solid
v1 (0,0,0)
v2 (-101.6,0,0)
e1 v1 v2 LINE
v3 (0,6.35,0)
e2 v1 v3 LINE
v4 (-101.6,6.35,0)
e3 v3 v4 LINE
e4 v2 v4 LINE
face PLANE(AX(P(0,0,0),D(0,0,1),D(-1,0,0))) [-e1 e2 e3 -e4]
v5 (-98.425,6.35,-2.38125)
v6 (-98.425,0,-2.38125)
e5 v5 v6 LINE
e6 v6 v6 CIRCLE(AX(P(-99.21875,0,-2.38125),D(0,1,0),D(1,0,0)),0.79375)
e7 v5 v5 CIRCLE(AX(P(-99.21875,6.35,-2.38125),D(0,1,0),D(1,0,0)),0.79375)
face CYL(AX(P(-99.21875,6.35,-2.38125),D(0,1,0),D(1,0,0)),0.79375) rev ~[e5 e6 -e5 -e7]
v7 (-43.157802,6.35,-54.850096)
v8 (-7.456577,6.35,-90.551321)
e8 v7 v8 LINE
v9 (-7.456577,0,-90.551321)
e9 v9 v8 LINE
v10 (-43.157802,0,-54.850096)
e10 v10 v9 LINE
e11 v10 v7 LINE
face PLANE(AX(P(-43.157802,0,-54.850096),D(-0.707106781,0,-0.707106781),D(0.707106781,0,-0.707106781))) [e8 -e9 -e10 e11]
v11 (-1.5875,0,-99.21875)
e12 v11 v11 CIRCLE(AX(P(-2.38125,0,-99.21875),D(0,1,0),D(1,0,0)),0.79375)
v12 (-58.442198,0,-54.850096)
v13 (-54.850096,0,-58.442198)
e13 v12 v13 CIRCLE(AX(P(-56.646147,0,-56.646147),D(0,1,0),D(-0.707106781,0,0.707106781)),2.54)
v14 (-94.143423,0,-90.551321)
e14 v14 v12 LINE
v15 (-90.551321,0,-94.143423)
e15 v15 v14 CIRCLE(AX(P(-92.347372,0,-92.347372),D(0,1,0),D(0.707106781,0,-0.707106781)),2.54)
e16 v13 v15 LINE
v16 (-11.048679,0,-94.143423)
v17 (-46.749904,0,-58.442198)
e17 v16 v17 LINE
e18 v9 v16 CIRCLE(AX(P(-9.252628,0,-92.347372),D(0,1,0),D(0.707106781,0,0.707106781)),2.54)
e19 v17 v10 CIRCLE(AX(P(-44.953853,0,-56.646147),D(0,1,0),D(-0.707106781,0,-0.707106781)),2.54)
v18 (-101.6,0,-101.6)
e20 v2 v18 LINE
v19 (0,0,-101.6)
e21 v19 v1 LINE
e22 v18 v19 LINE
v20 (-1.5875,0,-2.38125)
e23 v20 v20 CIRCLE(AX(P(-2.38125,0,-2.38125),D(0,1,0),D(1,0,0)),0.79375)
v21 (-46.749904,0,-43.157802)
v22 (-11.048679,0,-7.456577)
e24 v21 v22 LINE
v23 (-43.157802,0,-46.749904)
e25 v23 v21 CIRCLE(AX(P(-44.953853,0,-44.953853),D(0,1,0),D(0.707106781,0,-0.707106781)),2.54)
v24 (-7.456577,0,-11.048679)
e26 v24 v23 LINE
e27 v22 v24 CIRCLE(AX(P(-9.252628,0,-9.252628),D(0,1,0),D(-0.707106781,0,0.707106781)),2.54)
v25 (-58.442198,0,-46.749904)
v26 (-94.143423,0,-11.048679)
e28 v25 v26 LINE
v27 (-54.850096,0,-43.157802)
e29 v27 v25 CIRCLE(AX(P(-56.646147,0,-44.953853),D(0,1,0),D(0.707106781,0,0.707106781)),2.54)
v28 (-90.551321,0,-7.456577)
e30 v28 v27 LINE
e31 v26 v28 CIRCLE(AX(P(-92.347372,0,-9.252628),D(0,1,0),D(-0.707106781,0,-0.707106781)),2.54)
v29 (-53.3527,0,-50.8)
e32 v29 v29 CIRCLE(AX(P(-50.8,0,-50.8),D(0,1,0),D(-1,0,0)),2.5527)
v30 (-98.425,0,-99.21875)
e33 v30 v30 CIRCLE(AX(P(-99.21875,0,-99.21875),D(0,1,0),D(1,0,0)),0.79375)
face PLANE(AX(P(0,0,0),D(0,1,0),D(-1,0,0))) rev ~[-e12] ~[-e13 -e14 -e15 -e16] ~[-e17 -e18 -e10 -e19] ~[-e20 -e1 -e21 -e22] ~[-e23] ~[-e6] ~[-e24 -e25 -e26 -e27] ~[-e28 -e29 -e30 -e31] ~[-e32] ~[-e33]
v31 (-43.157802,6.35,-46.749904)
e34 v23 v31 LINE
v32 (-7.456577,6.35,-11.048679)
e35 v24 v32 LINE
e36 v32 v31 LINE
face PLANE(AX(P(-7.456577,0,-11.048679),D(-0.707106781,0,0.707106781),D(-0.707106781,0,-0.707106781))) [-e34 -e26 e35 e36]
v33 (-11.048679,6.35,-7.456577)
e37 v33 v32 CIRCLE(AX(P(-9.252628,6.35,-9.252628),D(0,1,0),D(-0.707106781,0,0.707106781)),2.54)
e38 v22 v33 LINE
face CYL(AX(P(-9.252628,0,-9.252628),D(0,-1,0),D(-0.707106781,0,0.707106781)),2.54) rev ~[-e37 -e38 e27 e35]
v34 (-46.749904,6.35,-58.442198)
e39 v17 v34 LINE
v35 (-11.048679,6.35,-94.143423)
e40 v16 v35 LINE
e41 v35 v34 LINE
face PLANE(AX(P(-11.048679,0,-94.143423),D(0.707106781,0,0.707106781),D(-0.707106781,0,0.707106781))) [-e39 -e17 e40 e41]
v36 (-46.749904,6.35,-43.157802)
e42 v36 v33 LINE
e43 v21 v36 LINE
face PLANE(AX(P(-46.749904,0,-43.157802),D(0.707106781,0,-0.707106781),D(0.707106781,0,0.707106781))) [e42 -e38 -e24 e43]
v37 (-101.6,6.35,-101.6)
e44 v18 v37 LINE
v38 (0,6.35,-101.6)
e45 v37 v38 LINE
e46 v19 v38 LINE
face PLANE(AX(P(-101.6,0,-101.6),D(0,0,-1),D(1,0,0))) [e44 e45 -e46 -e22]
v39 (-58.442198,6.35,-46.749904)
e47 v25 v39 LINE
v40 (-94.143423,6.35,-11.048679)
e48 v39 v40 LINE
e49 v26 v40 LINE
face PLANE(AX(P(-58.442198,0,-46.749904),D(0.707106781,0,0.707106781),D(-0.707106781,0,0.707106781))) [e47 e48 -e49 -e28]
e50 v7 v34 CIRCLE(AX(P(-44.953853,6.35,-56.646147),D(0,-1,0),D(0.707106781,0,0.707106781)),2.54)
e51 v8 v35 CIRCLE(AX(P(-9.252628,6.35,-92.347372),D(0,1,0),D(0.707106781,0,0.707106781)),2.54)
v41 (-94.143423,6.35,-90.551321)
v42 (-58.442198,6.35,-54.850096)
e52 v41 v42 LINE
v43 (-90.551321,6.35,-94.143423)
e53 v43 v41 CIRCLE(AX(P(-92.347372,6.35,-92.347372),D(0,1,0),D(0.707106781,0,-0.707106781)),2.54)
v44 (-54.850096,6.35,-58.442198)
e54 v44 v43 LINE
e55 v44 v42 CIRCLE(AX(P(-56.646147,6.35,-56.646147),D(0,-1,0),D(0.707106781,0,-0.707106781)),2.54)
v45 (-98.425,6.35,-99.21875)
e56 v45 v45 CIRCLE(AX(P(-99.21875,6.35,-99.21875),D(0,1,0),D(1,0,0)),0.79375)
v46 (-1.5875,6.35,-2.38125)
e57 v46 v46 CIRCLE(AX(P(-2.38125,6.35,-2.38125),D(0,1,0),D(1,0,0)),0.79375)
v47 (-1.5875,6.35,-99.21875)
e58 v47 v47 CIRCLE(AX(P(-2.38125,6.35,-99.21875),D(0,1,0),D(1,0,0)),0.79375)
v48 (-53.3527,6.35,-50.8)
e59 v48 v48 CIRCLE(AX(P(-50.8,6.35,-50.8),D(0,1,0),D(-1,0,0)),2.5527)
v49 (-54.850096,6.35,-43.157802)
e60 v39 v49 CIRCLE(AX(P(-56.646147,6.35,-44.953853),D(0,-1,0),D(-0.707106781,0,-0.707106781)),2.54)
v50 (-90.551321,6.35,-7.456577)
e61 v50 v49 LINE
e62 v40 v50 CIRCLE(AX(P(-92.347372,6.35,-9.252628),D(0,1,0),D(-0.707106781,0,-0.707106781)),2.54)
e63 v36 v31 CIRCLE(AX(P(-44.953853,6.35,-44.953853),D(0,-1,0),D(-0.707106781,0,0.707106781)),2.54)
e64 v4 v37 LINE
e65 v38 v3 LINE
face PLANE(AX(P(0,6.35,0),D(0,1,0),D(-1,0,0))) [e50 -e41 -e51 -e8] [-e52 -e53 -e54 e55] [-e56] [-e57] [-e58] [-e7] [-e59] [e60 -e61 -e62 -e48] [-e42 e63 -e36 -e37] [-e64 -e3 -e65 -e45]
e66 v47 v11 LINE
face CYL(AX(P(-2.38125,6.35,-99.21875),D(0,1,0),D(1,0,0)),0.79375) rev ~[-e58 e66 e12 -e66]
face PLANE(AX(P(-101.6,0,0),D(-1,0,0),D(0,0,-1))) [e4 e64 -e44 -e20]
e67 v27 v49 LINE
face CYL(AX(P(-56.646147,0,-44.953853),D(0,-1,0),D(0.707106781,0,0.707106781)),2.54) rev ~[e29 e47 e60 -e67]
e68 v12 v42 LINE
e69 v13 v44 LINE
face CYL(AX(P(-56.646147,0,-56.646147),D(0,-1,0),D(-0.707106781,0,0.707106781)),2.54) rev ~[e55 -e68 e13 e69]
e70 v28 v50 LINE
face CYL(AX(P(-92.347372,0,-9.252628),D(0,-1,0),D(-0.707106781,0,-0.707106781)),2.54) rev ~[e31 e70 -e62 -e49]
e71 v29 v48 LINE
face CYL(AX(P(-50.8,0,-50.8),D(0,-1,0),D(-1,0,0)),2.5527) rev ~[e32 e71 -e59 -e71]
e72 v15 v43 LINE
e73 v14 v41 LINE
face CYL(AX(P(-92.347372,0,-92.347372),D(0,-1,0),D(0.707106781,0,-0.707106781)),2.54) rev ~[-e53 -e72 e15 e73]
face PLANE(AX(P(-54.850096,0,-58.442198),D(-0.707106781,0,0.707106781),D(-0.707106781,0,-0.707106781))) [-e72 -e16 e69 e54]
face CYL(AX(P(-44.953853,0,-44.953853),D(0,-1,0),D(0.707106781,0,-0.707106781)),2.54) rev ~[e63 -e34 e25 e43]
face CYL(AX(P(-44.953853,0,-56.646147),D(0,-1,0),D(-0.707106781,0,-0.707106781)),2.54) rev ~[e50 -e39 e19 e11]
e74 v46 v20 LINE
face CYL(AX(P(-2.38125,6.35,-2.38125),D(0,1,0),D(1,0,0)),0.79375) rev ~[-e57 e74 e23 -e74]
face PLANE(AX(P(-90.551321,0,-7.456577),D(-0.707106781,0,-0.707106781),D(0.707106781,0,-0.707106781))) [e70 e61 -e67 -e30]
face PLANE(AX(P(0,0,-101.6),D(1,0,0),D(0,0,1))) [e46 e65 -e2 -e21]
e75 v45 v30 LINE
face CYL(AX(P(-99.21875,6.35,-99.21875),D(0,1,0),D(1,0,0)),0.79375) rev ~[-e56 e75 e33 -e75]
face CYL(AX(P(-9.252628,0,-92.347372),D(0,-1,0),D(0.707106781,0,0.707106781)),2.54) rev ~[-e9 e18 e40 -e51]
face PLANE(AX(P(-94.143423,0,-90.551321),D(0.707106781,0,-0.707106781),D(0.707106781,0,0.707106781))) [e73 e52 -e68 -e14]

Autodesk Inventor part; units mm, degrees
ref_plane "YZ Plane" through (0, 0, 0) normal (1, 0, 0) x (0, 1, 0)
ref_plane "XZ Plane" through (0, 0, 0) normal (0, 1, 0) x (-1, 0, 0)
ref_plane "XY Plane" through (0, 0, 0) normal (0, 0, 1) x (1, 0, 0)
sketch "Sketch1" plane through (0, 0, 0) normal (0, 1, 0) x (-1, 0, 0)
  line L0 (0, 0) -> (101.6, 0)
  line L1 (101.6, 0) -> (101.6, -101.6)
  line L2 (101.6, -101.6) -> (0, -101.6)
  line L3 (0, -101.6) -> (0, 0)
  line L4 (4.7625, -96.8375) -> (96.8375, -96.8375)
  line L5 (96.8375, -96.8375) -> (96.8375, -4.7625)
  line L6 (96.8375, -4.7625) -> (4.7625, -4.7625)
  line L7 (4.7625, -4.7625) -> (4.7625, -96.8375)
  line L8 (96.8375, -4.7625) -> (4.7625, -96.8375) construction
  circle A0 centre (50.8, -50.8) radius 2.5527
  circle A1 centre (50.8, -50.8) radius 5.7277
  line L9 (54.850096, -46.749904) -> (94.143423, -7.456577) construction
  line L10 (58.442198, -46.749904) -> (94.143423, -11.048679)
  line L11 (90.551321, -7.456577) -> (54.850096, -43.157802)
  arc A2 (54.850096, -43.157802) -> (58.442198, -46.749904) centre (56.646147, -44.953853) ccw
  arc A3 (94.143423, -11.048679) -> (90.551321, -7.456577) centre (92.347372, -9.252628) ccw
  line L12 (46.749904, -43.157802) -> (11.048679, -7.456577)
  arc A4 (43.157802, -46.749904) -> (46.749904, -43.157802) centre (44.953853, -44.953853) ccw
  line L13 (7.456577, -11.048679) -> (43.157802, -46.749904)
  arc A5 (11.048679, -7.456577) -> (7.456577, -11.048679) centre (9.252628, -9.252628) ccw
  line L14 (43.157802, -54.850096) -> (7.456577, -90.551321)
  arc A6 (46.749904, -58.442198) -> (43.157802, -54.850096) centre (44.953853, -56.646147) ccw
  line L15 (11.048679, -94.143423) -> (46.749904, -58.442198)
  arc A7 (7.456577, -90.551321) -> (11.048679, -94.143423) centre (9.252628, -92.347372) ccw
  line L16 (54.850096, -58.442198) -> (90.551321, -94.143423)
  arc A8 (58.442198, -54.850096) -> (54.850096, -58.442198) centre (56.646147, -56.646147) ccw
  line L17 (94.143423, -90.551321) -> (58.442198, -54.850096)
  arc A9 (90.551321, -94.143423) -> (94.143423, -90.551321) centre (92.347372, -92.347372) ccw
  point P0 (0, -50.8)
  point P1 (74.496759, -27.103241)
  dimension "d0" = 101.6
  dimension "d1" = 101.6
  dimension "d2" = 4.7625
  dimension "d33" = 5.1054
  dimension "d34" = 3.175
  dimension "d35" = 5.08
  dimension "d36" = 6.35
  dimension "d39" = 360
extrude "Extrusion1" add sketch "Sketch1" along normal blind 6.35 contours L0 L1 L2 L3 | L7 L6 L5 L4 | A1
sketch "Sketch2" plane through (0, 6.35, 0) normal (0, 1, 0) x (1, 0, 0)
  line L0 (0, 101.6) -> (-101.6, 101.6)
  line L1 (-101.6, 101.6) -> (-101.6, 0)
  line L2 (-101.6, 0) -> (0, 0)
  line L3 (0, 0) -> (0, 101.6)
  circle A0 centre (-99.21875, 99.21875) radius 0.79375
  circle A1 centre (-99.21875, 2.38125) radius 0.79375
  circle A2 centre (-2.38125, 99.21875) radius 0.79375
  circle A3 centre (-2.38125, 2.38125) radius 0.79375
  dimension "d20" = 1.5875
  dimension "d21" = 2.38125
  dimension "d22" = 2.38125
  dimension "d25" = 96.8375
  dimension "d28" = 96.8375
extrude "Extrusion2" cut sketch "Sketch2" against normal blind 6.35 contours A0 | A1 | A2 | A3
sketch "Sketch3" plane through (0, 6.35, 0) normal (0, 1, 0) x (1, 0, 0)
  circle A0 centre (-99.21875, 99.21875) radius 0.79375
  circle A1 centre (-99.21875, 2.38125) radius 0.79375
  circle A2 centre (-2.38125, 99.21875) radius 0.79375
  circle A3 centre (-2.38125, 2.38125) radius 0.79375
  line L0 (0, 101.6) -> (-101.6, 101.6)
  line L1 (-101.6, 101.6) -> (-101.6, 0)
  line L2 (-101.6, 0) -> (0, 0)
  line L3 (0, 0) -> (0, 101.6)
  arc A4 (-58.442198, 54.850096) -> (-54.850096, 58.442198) centre (-56.646147, 56.646147) ccw
  line L4 (-58.442198, 54.850096) -> (-94.143423, 90.551321)
  arc A5 (-90.551321, 94.143423) -> (-94.143423, 90.551321) centre (-92.347372, 92.347372) ccw
  line L5 (-90.551321, 94.143423) -> (-54.850096, 58.442198)
  circle A6 centre (-50.8, 50.8) radius 2.5527
  arc A7 (-46.749904, 58.442198) -> (-43.157802, 54.850096) centre (-44.953853, 56.646147) ccw
  line L6 (-46.749904, 58.442198) -> (-11.048679, 94.143423)
  arc A8 (-7.456577, 90.551321) -> (-11.048679, 94.143423) centre (-9.252628, 92.347372) ccw
  line L7 (-7.456577, 90.551321) -> (-43.157802, 54.850096)
  arc A9 (-43.157802, 46.749904) -> (-46.749904, 43.157802) centre (-44.953853, 44.953853) ccw
  line L8 (-43.157802, 46.749904) -> (-7.456577, 11.048679)
  arc A10 (-11.048679, 7.456577) -> (-7.456577, 11.048679) centre (-9.252628, 9.252628) ccw
  line L9 (-11.048679, 7.456577) -> (-46.749904, 43.157802)
  arc A11 (-54.850096, 43.157802) -> (-58.442198, 46.749904) centre (-56.646147, 44.953853) ccw
  line L10 (-54.850096, 43.157802) -> (-90.551321, 7.456577)
  arc A12 (-94.143423, 11.048679) -> (-90.551321, 7.456577) centre (-92.347372, 9.252628) ccw
  line L11 (-94.143423, 11.048679) -> (-58.442198, 46.749904)
sketch "Sketch4" plane through (0, 6.35, 0) normal (0, 1, 0) x (1, 0, 0)
  circle A0 centre (-99.21875, 99.21875) radius 0.79375
  circle A1 centre (-99.21875, 2.38125) radius 0.79375
  circle A2 centre (-2.38125, 99.21875) radius 0.79375
  circle A3 centre (-2.38125, 2.38125) radius 0.79375
  line L0 (0, 101.6) -> (-101.6, 101.6)
  line L1 (-101.6, 101.6) -> (-101.6, 0)
  line L2 (-101.6, 0) -> (0, 0)
  line L3 (0, 0) -> (0, 101.6)
  arc A4 (-58.442198, 54.850096) -> (-54.850096, 58.442198) centre (-56.646147, 56.646147) ccw
  line L4 (-58.442198, 54.850096) -> (-94.143423, 90.551321)
  arc A5 (-90.551321, 94.143423) -> (-94.143423, 90.551321) centre (-92.347372, 92.347372) ccw
  line L5 (-90.551321, 94.143423) -> (-54.850096, 58.442198)
  circle A6 centre (-50.8, 50.8) radius 2.5527
  arc A7 (-46.749904, 58.442198) -> (-43.157802, 54.850096) centre (-44.953853, 56.646147) ccw
  line L6 (-46.749904, 58.442198) -> (-11.048679, 94.143423)
  arc A8 (-7.456577, 90.551321) -> (-11.048679, 94.143423) centre (-9.252628, 92.347372) ccw
  line L7 (-7.456577, 90.551321) -> (-43.157802, 54.850096)
  arc A9 (-43.157802, 46.749904) -> (-46.749904, 43.157802) centre (-44.953853, 44.953853) ccw
  line L8 (-43.157802, 46.749904) -> (-7.456577, 11.048679)
  arc A10 (-11.048679, 7.456577) -> (-7.456577, 11.048679) centre (-9.252628, 9.252628) ccw
  line L9 (-11.048679, 7.456577) -> (-46.749904, 43.157802)
  arc A11 (-54.850096, 43.157802) -> (-58.442198, 46.749904) centre (-56.646147, 44.953853) ccw
  line L10 (-54.850096, 43.157802) -> (-90.551321, 7.456577)
  arc A12 (-94.143423, 11.048679) -> (-90.551321, 7.456577) centre (-92.347372, 9.252628) ccw
  line L11 (-94.143423, 11.048679) -> (-58.442198, 46.749904)
  circle A13 centre (-36.53596, 36.53596) radius 2.159
  line L12 (-44.953853, 44.953853) -> (-9.252628, 9.252628) construction
  circle A14 centre (-50.8, 50.8) radius 25.4
  line L13 (-45.068826, 32.632552) -> (-56.531174, 68.967448) construction
  circle A15 centre (-45.068826, 32.632552) radius 2.159 construction
  circle A16 centre (-56.531174, 68.967448) radius 2.159 construction
  line L14 (-56.531174, 68.967448) -> (-36.53596, 36.53596) construction
  dimension "d41" = 4.318
  dimension "d42" = 50.8
  dimension "d43" = 4.318
  dimension "d44" = 4.318
  dimension "d45" = 38.1
  dimension "d46" = 38.1
ref_plane "Work Plane1" through (-56.646147, 0, -44.953853) normal (0.7071068, 0, 0.7071068) x (0.7071068, 0, -0.7071068)
properties part number "Layer 5"
